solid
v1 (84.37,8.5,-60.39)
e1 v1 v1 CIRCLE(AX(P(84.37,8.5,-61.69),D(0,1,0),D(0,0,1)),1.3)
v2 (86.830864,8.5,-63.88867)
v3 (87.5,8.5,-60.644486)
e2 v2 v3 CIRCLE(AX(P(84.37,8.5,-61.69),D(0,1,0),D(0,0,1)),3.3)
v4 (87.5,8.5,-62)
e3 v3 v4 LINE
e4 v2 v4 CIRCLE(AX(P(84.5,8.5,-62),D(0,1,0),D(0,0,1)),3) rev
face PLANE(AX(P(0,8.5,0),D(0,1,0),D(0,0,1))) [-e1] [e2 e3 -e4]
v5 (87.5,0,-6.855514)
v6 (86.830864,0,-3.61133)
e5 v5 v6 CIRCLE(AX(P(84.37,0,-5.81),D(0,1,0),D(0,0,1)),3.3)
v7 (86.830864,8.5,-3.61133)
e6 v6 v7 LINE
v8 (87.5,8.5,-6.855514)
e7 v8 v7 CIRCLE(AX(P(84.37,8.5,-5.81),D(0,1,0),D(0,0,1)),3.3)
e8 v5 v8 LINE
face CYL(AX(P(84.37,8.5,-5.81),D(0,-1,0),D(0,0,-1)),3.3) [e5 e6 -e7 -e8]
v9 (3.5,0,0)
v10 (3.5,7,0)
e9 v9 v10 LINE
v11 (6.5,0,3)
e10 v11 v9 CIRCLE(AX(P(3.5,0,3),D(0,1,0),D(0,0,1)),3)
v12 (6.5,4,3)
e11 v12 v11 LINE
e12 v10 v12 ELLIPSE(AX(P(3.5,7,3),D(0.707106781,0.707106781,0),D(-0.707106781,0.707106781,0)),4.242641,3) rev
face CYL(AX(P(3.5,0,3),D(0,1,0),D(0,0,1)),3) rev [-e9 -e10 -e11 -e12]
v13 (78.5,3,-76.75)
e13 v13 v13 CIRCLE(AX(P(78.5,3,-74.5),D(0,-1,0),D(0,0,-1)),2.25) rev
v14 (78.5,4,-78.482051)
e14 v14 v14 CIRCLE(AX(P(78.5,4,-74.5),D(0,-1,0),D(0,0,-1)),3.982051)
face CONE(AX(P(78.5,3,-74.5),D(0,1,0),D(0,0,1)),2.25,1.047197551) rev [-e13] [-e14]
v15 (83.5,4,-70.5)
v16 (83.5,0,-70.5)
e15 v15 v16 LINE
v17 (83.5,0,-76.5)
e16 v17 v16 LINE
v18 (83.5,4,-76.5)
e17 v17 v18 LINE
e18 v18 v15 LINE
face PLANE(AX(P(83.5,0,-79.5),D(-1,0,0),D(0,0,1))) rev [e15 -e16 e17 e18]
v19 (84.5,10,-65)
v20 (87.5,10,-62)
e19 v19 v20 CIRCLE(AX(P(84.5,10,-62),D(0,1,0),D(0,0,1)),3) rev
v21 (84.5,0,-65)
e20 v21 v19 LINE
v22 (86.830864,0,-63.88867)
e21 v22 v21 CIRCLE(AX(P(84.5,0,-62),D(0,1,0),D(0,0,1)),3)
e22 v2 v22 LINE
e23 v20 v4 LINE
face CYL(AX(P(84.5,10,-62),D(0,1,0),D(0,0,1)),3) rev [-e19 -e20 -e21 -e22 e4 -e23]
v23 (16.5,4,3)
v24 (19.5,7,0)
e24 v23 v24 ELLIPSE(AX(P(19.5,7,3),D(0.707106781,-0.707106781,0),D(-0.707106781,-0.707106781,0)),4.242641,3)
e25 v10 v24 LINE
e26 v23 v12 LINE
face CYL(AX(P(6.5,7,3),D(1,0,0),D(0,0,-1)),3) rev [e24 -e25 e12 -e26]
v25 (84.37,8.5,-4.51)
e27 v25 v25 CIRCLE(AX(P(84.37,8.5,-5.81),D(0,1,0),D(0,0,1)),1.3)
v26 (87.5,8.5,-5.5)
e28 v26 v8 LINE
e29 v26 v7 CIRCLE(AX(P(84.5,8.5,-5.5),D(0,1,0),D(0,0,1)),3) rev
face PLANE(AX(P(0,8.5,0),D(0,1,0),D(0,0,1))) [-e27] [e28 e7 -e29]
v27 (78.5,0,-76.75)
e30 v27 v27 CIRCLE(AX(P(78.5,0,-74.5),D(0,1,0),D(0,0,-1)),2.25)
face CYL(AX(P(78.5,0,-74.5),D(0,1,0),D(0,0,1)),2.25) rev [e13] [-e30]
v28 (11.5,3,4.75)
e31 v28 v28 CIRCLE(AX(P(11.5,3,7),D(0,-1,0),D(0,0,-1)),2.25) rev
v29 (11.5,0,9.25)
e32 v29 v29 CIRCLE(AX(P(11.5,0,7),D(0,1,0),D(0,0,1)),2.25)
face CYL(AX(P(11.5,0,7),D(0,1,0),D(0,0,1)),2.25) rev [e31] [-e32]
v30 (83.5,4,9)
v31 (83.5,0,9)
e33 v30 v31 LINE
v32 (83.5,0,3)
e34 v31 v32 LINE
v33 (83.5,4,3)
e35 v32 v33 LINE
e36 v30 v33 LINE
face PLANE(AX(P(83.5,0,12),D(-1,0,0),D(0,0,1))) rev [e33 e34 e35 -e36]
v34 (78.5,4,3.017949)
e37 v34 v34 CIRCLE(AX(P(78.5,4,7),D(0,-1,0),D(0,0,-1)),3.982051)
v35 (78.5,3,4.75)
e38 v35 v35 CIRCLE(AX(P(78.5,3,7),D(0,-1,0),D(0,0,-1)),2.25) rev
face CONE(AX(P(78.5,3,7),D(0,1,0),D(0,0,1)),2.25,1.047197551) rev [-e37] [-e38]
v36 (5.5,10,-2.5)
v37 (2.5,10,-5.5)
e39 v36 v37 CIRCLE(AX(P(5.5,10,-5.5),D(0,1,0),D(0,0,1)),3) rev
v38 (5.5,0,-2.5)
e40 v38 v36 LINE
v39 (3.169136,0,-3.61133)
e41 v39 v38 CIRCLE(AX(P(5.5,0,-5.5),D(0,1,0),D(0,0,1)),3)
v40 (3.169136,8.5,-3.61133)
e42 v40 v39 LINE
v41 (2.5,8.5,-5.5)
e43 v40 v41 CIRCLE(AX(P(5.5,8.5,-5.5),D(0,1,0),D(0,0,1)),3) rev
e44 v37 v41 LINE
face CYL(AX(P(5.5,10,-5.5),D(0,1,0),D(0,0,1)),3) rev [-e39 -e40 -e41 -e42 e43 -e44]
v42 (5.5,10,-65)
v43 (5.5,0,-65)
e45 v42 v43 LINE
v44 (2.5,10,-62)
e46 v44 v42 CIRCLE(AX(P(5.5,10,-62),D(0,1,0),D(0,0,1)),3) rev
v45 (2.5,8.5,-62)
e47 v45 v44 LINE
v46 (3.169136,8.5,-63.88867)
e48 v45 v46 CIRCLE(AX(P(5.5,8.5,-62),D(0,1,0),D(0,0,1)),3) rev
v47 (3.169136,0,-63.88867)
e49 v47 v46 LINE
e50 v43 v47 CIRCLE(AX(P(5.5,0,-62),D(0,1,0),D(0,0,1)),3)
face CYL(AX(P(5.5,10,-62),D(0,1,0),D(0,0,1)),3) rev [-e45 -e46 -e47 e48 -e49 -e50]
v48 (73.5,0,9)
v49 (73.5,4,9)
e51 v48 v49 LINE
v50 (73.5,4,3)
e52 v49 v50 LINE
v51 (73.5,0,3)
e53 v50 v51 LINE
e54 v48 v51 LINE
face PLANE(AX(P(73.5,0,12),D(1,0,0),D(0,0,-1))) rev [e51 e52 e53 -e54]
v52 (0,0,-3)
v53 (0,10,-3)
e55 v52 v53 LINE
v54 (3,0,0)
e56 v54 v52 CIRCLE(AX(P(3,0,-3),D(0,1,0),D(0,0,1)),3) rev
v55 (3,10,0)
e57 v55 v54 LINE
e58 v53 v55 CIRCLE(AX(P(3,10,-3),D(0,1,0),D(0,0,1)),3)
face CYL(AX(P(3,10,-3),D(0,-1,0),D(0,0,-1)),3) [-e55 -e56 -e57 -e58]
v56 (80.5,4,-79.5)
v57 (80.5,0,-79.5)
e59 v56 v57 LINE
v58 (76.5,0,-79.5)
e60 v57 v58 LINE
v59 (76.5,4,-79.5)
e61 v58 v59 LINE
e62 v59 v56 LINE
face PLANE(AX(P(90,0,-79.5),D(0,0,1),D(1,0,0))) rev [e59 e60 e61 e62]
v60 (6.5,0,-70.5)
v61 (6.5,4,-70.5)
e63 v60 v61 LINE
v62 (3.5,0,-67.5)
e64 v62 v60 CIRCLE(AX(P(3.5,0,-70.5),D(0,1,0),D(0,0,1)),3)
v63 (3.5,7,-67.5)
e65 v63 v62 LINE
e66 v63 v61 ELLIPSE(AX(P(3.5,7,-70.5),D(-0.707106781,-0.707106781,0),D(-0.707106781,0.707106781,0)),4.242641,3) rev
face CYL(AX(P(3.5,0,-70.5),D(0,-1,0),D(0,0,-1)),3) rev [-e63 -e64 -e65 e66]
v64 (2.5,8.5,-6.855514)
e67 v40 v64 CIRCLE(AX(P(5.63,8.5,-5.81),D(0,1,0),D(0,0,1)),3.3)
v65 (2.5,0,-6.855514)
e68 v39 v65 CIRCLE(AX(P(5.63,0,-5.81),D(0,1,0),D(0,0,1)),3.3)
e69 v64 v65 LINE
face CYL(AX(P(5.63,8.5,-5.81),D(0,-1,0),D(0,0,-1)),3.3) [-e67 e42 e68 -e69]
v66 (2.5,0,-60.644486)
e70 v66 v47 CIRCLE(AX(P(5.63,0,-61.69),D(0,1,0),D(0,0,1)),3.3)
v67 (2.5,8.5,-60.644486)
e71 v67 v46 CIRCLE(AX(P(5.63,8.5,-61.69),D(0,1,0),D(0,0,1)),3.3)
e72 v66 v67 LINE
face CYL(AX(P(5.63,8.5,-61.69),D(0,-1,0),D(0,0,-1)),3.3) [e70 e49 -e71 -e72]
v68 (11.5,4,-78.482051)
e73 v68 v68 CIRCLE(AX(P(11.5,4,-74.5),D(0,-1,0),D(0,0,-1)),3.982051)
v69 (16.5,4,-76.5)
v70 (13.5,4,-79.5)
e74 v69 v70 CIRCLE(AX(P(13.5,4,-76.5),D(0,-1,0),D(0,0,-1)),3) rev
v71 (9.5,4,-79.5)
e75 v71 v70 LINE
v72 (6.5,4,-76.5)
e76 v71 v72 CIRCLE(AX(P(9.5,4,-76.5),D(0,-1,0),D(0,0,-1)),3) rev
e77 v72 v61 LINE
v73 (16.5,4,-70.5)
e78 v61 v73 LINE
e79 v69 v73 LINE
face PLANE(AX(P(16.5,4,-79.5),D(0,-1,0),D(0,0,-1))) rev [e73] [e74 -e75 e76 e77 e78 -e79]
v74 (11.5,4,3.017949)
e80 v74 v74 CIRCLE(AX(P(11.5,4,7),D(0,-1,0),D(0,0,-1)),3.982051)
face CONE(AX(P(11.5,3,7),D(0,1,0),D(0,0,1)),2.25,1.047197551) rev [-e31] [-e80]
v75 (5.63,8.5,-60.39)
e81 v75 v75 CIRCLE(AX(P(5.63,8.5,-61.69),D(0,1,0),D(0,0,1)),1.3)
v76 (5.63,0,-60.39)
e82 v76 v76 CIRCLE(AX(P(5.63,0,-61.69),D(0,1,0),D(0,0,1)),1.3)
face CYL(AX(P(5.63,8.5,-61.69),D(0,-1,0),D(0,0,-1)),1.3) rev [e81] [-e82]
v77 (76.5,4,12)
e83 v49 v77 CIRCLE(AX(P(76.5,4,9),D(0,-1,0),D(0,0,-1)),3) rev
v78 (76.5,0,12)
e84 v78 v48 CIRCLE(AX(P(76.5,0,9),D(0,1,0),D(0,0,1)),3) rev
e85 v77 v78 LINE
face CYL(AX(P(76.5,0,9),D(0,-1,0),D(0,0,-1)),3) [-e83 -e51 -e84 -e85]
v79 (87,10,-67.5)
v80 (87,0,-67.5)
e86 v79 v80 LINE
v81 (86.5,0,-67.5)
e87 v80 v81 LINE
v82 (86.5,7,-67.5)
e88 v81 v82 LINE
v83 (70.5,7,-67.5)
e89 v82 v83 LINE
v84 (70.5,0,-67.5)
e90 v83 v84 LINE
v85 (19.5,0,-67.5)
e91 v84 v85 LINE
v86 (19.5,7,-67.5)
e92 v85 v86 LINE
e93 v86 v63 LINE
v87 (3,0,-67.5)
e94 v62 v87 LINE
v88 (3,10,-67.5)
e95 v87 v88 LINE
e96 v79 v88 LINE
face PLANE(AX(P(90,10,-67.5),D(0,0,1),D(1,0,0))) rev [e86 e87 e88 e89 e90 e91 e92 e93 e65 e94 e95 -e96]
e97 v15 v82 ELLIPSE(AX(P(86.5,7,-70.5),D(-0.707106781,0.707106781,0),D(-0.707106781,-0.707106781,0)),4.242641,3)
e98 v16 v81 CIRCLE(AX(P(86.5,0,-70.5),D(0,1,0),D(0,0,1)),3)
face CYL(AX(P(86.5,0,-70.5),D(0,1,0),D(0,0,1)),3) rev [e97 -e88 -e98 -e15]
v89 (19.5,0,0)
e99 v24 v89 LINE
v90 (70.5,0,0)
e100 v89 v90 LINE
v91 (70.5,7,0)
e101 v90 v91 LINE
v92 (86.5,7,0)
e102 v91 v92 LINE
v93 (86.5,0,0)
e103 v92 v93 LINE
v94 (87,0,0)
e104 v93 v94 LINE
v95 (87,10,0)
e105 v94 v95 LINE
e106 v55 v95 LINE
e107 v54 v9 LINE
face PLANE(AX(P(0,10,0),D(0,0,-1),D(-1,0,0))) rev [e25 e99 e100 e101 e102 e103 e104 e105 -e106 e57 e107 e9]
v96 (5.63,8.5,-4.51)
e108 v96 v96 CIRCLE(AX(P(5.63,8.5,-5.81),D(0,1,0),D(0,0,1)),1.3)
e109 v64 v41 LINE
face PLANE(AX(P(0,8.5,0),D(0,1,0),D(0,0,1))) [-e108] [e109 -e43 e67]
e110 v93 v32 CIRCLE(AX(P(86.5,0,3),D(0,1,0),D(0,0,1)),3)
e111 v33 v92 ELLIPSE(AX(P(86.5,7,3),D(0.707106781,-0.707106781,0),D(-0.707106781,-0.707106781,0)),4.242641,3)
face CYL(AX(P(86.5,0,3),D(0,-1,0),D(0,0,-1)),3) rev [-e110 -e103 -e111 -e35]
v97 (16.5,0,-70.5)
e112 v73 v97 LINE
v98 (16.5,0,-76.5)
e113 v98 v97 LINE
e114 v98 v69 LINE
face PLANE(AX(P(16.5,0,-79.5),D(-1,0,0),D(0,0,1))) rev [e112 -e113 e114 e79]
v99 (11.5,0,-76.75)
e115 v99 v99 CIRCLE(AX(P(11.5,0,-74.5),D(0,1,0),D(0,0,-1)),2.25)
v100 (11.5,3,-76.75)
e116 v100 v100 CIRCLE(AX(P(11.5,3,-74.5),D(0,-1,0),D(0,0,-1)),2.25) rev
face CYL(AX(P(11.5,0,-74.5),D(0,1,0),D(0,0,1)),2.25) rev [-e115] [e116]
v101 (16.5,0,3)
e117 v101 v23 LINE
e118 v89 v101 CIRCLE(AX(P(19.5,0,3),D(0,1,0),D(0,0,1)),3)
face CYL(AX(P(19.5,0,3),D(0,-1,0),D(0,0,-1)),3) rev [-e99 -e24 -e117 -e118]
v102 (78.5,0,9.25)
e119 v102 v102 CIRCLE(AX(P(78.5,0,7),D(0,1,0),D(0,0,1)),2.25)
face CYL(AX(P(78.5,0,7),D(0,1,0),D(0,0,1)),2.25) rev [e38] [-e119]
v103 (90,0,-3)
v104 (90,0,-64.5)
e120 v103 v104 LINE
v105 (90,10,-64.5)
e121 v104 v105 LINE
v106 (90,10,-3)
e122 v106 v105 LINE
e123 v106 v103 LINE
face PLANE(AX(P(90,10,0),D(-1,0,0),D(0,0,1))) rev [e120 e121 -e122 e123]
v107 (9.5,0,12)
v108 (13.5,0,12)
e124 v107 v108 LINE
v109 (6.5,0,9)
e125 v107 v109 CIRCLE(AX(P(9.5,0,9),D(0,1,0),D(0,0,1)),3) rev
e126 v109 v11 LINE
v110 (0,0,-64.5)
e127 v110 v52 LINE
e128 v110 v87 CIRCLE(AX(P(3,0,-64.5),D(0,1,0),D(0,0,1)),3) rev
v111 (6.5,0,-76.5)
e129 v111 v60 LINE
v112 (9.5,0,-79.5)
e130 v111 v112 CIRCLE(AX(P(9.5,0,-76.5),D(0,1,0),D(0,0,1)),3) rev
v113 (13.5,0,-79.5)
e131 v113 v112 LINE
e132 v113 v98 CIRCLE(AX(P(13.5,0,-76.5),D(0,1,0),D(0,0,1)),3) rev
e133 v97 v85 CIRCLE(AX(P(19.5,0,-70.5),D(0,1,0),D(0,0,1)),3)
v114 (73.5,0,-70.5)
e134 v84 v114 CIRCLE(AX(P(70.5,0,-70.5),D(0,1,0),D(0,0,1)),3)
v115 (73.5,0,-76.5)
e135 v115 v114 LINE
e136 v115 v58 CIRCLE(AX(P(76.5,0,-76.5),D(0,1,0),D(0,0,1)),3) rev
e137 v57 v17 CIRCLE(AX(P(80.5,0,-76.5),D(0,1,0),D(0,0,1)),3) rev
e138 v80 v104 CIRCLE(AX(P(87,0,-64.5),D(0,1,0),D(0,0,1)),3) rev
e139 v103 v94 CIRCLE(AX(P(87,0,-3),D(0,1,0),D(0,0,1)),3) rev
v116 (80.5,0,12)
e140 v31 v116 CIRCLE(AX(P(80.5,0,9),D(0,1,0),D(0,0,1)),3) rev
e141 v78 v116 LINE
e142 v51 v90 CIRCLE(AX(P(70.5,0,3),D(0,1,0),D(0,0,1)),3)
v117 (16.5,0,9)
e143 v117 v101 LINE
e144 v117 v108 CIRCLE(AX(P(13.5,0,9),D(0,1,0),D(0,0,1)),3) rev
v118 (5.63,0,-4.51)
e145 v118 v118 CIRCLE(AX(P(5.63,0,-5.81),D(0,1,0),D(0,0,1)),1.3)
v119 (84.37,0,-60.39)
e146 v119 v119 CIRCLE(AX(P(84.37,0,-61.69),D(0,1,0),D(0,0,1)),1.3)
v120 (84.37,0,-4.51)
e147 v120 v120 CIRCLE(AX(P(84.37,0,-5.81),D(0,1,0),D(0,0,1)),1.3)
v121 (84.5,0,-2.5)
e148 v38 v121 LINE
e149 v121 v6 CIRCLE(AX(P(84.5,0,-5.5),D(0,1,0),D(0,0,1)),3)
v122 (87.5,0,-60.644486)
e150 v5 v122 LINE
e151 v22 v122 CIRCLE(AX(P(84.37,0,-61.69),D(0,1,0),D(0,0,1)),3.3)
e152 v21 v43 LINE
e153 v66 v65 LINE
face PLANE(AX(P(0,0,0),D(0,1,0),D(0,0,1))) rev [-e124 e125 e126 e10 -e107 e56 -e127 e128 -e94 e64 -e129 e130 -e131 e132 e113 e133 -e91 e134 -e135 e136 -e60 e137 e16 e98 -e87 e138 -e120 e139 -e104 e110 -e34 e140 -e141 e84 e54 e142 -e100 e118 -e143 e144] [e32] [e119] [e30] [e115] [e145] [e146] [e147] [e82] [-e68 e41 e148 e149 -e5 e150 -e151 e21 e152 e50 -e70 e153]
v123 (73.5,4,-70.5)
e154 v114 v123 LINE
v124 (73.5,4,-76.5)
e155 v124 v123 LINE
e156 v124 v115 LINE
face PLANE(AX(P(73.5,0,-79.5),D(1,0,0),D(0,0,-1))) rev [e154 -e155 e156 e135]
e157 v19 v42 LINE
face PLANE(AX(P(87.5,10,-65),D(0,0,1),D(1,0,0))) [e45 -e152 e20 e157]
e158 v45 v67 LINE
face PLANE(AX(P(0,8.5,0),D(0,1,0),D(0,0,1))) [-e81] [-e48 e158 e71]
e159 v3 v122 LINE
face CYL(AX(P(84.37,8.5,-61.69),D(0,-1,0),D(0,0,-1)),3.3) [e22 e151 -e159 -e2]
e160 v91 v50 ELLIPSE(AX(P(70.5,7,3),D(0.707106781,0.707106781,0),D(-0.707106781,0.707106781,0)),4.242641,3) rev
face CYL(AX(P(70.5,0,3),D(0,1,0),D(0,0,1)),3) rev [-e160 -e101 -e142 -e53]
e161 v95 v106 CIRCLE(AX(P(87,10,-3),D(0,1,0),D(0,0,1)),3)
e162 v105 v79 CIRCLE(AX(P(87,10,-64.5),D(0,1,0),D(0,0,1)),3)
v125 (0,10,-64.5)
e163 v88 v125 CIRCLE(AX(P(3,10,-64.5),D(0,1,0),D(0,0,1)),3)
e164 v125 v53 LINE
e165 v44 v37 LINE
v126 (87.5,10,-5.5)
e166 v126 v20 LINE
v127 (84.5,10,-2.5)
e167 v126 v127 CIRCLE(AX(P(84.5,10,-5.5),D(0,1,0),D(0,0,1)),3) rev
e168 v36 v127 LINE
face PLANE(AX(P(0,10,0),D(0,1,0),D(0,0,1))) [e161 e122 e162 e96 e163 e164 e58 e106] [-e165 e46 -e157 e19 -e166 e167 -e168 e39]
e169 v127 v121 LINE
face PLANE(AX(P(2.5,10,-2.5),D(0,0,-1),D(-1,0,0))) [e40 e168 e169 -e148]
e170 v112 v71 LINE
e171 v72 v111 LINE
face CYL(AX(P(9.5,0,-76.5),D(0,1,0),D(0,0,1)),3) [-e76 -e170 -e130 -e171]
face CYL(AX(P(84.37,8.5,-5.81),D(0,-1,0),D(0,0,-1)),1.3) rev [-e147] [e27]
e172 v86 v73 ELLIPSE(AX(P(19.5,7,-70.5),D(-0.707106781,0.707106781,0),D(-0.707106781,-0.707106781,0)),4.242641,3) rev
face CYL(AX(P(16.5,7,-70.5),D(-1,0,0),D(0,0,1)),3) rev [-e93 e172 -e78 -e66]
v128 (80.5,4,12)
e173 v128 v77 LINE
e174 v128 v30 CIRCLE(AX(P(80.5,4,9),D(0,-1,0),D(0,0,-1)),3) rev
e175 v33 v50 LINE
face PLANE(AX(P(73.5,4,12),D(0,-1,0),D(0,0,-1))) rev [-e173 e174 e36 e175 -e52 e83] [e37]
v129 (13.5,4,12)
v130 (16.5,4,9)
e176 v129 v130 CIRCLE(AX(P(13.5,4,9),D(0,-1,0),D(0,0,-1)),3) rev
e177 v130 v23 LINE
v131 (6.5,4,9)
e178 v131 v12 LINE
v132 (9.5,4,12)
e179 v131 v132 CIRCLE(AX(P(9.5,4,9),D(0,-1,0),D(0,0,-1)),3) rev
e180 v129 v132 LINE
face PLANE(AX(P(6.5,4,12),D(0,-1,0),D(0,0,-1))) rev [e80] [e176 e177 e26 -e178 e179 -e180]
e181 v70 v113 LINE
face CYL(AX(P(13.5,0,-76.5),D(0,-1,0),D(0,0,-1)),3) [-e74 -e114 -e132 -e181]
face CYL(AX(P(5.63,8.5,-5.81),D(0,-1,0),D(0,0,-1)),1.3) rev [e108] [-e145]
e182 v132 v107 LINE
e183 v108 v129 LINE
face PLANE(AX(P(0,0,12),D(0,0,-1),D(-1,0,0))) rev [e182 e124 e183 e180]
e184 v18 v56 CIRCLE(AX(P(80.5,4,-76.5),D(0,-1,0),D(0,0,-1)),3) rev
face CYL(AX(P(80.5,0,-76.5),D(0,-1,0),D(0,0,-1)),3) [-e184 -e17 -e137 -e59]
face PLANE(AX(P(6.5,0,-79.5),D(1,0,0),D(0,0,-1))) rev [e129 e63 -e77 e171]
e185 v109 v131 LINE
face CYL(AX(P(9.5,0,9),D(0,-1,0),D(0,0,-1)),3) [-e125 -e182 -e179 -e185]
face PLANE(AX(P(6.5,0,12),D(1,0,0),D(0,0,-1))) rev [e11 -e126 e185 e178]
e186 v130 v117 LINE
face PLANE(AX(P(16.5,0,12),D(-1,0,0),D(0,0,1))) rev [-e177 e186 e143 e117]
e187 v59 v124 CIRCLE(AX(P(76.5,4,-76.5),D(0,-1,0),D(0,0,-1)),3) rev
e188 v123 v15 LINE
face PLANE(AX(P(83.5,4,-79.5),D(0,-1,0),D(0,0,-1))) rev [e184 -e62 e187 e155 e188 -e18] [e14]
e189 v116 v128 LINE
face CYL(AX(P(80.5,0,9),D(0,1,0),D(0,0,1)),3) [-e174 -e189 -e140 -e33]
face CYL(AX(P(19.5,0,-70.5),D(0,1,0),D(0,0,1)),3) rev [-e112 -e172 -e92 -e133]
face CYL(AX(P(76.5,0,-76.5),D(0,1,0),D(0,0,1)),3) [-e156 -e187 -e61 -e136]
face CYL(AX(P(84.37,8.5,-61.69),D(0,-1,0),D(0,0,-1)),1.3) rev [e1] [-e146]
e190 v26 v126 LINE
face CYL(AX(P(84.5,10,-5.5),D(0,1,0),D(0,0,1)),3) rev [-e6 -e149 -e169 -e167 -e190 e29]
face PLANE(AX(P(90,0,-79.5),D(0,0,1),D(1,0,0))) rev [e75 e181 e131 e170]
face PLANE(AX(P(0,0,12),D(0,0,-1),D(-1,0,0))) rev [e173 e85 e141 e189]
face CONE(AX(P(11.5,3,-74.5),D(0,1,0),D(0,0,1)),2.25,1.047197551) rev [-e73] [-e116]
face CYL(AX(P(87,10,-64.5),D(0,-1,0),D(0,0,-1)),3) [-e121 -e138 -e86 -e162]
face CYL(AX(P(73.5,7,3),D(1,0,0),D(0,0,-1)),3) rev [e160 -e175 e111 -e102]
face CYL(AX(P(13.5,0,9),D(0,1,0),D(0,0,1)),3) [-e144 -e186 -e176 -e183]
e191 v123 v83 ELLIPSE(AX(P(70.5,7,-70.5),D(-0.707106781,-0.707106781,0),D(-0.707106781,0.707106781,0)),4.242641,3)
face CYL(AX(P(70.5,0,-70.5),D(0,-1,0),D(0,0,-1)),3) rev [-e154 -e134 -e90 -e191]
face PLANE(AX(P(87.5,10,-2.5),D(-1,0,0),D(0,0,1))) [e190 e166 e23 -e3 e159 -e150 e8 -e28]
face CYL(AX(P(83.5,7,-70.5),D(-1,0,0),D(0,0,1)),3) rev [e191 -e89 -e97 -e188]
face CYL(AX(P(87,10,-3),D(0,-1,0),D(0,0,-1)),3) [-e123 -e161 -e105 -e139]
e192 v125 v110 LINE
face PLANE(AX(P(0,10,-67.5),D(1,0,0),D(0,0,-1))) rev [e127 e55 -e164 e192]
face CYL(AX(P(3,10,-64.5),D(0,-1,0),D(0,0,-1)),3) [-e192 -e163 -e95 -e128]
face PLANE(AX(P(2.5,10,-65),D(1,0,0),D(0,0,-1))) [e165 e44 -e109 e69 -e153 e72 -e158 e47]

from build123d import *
from OCP.BRepFilletAPI import BRepFilletAPI_MakeChamfer

# Parameters (mm, degrees)
SKETCH5_W             = 90
SKETCH5_H             = 67.5
SKETCH5_W_2           = 85
SKETCH5_H_2           = 62.5
BOSS_EXTRUDE3_DEPTH   = 10
FILLET1_R             = 3
SKETCH7_R             = 3.3
SKETCH7_R_2           = 1.3
BOSS_EXTRUDE5_DEPTH   = 8.5
SKETCH11_W            = 10
SKETCH11_H            = 4
BOSS_EXTRUDE6_DEPTH   = 12
FILLET3_R             = 3
SKETCH13_R            = 2.25
CUT_EXTRUDE1_DEPTH    = 113.659886384
CHAMFER2_SIZE         = 1
CHAMFER2_SIZE2        = 1.732050808
CIRPATTERN1_OUTLINE_R = 2.25
CIRPATTERN1_DEPTH     = 2.9999999
CIRPATTERN1_START     = 2.9999999
CIRPATTERN1_2_DEPTH   = 1.0000001
FILLET5_R             = 3


with BuildPart() as part:
    # Sketch5 → Boss-Extrude3 (new body)
    with BuildSketch(Plane(origin=(0, 0, 0), x_dir=(1, 0, 0), z_dir=(0, 1, 0))):
        with Locations((45, 33.75)):
            Rectangle(SKETCH5_W, SKETCH5_H)
        with Locations((45, 33.75)):
            Rectangle(SKETCH5_W_2, SKETCH5_H_2, mode=Mode.SUBTRACT)
    extrude(amount=BOSS_EXTRUDE3_DEPTH)

    # Fillet1
    fillet1_edges = [part.edges().sort_by_distance(p)[0] for p in [
        (87.5, 5, -2.5),
        (87.5, 5, -65),
        (2.5, 5, -65),
        (2.5, 5, -2.5),
        (90, 5, -67.5),
        (90, 5, 0),
        (0, 5, 0),
        (0, 5, -67.5),
    ]]
    fillet(fillet1_edges, radius=FILLET1_R)

    # Sketch7 → Boss-Extrude5 (add)
    # profile 1 of 4: a face of its own
    with BuildSketch(Plane(origin=(0, 0, 0), x_dir=(1, 0, 0), z_dir=(0, 1, 0))):
        with Locations((5.63, 5.81)):
            Circle(SKETCH7_R)
        with Locations(Location((5.63, 5.81, 0), (0, 0, 270))):
            Circle(SKETCH7_R_2, mode=Mode.SUBTRACT)
    # profile 2 of 4: a face of its own
    with BuildSketch(Plane(origin=(0, 0, 0), x_dir=(1, 0, 0), z_dir=(0, 1, 0))):
        with Locations((5.63, 61.69)):
            Circle(SKETCH7_R)
        with Locations(Location((5.63, 61.69, 0), (0, 0, 270))):
            Circle(SKETCH7_R_2, mode=Mode.SUBTRACT)
    # profile 3 of 4: a face of its own
    with BuildSketch(Plane(origin=(0, 0, 0), x_dir=(1, 0, 0), z_dir=(0, 1, 0))):
        with Locations((84.37, 5.81)):
            Circle(SKETCH7_R)
        with Locations(Location((84.37, 5.81, 0), (0, 0, 270))):
            Circle(SKETCH7_R_2, mode=Mode.SUBTRACT)
    # profile 4 of 4: a face of its own
    with BuildSketch(Plane(origin=(0, 0, 0), x_dir=(1, 0, 0), z_dir=(0, 1, 0))):
        with Locations((84.37, 61.69)):
            Circle(SKETCH7_R)
        with Locations(Location((84.37, 61.69, 0), (0, 0, 270))):
            Circle(SKETCH7_R_2, mode=Mode.SUBTRACT)
    extrude(amount=BOSS_EXTRUDE5_DEPTH)

    # Sketch11 → Boss-Extrude6 (add)
    with BuildSketch(Plane.XY):
        with Locations((11.5, 2)):
            Rectangle(SKETCH11_W, SKETCH11_H)
        with Locations((78.5, 2)):
            Rectangle(SKETCH11_W, SKETCH11_H)
    extrude(amount=BOSS_EXTRUDE6_DEPTH)

    # Fillet3
    fillet3_edges = [part.edges().sort_by_distance(p)[0] for p in [
        (6.5, 2, 0),
        (16.5, 2, 0),
        (11.5, 4, 0),
        (6.5, 2, 12),
        (16.5, 2, 12),
        (73.5, 2, 0),
        (83.5, 2, 0),
        (78.5, 4, 0),
        (73.5, 2, 12),
        (83.5, 2, 12),
    ]]
    fillet(fillet3_edges, radius=FILLET3_R)

    # Sketch13 → Cut-Extrude1 (cut, through all)
    with BuildSketch(Plane(origin=(0, 4, 0), x_dir=(1, 0, 0), z_dir=(0, 1, 0))):
        with Locations(Location((11.5, -7, 0), (0, 0, 270))):
            Circle(SKETCH13_R)
        with Locations(Location((78.5, -7, 0), (0, 0, 270))):
            Circle(SKETCH13_R)
    extrude(amount=-CUT_EXTRUDE1_DEPTH, mode=Mode.SUBTRACT)

    # Chamfer2: one chamfer whose edges measure the first distance from different faces: ONE call of the kernel's chamfer builder (chamfer() names one face for all edges)
    chamfer2_edges_1 = [part.edges().sort_by_distance(p)[0] for p in [
        (11.5, 4, 4.75),
    ]]
    chamfer2_side_1 = [part.faces().sort_by_distance(p)[0] for p in [
        (11.5, 2, 4.75),
    ]]
    chamfer2_edges_2 = [part.edges().sort_by_distance(p)[0] for p in [
        (78.5, 4, 4.75),
    ]]
    chamfer2_side_2 = [part.faces().sort_by_distance(p)[0] for p in [
        (78.5, 2, 4.75),
    ]]
    chamfer2 = BRepFilletAPI_MakeChamfer(part.part.solid().wrapped)
    for e in chamfer2_edges_1:
        chamfer2.Add(CHAMFER2_SIZE, CHAMFER2_SIZE2, e.wrapped, chamfer2_side_1[0].wrapped)  # the first distance lies on this face
    for e in chamfer2_edges_2:
        chamfer2.Add(CHAMFER2_SIZE, CHAMFER2_SIZE2, e.wrapped, chamfer2_side_2[0].wrapped)  # the first distance lies on this face
    add(Compound.cast(chamfer2.Shape()), mode=Mode.REPLACE)

    # CirPattern1: read off the stored shape, not the designer's step
    # CirPattern1 outline → CirPattern1 (add)
    # profile 1 of 2: a face of its own
    with BuildSketch(Plane(origin=(0, 0, 0), x_dir=(1, 0, 0), z_dir=(0, 1, 0))):
        with BuildLine():
            Line((73.5, 76.5), (73.5, 67.5))
            Line((73.5, 67.5), (83.5, 67.5))
            Line((83.5, 67.5), (83.5, 76.5))
            ThreePointArc((83.5, 76.5), (82.621320344, 78.621320344), (80.5, 79.5))
            Line((80.5, 79.5), (76.5, 79.5))
            ThreePointArc((76.5, 79.5), (74.378679656, 78.621320344), (73.5, 76.5))
        make_face()
        with Locations((78.5, 74.5)):
            Circle(CIRPATTERN1_OUTLINE_R, mode=Mode.SUBTRACT)
    # profile 2 of 2: a face of its own
    with BuildSketch(Plane(origin=(0, 0, 0), x_dir=(1, 0, 0), z_dir=(0, 1, 0))):
        with BuildLine():
            Line((6.5, 76.5), (6.5, 67.5))
            Line((6.5, 67.5), (16.5, 67.5))
            Line((16.5, 67.5), (16.5, 76.5))
            ThreePointArc((16.5, 76.5), (15.621320344, 78.621320344), (13.5, 79.5))
            Line((13.5, 79.5), (9.5, 79.5))
            ThreePointArc((9.5, 79.5), (7.378679656, 78.621320344), (6.5, 76.5))
        make_face()
        with Locations((11.5, 74.5)):
            Circle(CIRPATTERN1_OUTLINE_R, mode=Mode.SUBTRACT)
    extrude(amount=CIRPATTERN1_DEPTH)

    # CirPattern1 2 outline → CirPattern1 2 (add)
    with BuildSketch(Plane(origin=(0, 0, 0), x_dir=(1, 0, 0), z_dir=(0, 1, 0)).offset(CIRPATTERN1_START)):
        with BuildLine():
            Line((73.5, 76.5), (73.5, 67.5))
            Line((73.5, 67.5), (83.5, 67.5))
            Line((83.5, 67.5), (83.5, 76.5))
            ThreePointArc((83.5, 76.5), (82.621320344, 78.621320344), (80.5, 79.5))
            Line((80.5, 79.5), (76.5, 79.5))
            ThreePointArc((76.5, 79.5), (74.378679656, 78.621320344), (73.5, 76.5))
        make_face()
        with BuildLine():
            Line((6.5, 76.5), (6.5, 67.5))
            Line((6.5, 67.5), (16.5, 67.5))
            Line((16.5, 67.5), (16.5, 76.5))
            ThreePointArc((16.5, 76.5), (15.621320344, 78.621320344), (13.5, 79.5))
            Line((13.5, 79.5), (9.5, 79.5))
            ThreePointArc((9.5, 79.5), (7.378679656, 78.621320344), (6.5, 76.5))
        make_face()
    extrude(amount=CIRPATTERN1_2_DEPTH)

    # CirPattern1 3: loft between two sections, ruled curve by curve
    cirpattern1_3_from = [
        Edge.make_three_point_arc((11.5, 3, -76.75), (9.25, 3, -74.5), (11.5, 3, -72.25)),
        Edge.make_three_point_arc((11.5, 3, -72.25), (13.75, 3, -74.5), (11.5, 3, -76.75)),
    ]
    cirpattern1_3_to = [
        Edge.make_three_point_arc((11.5, 4, -78.482050808), (7.517949192, 4, -74.5), (11.5, 4, -70.517949192)),
        Edge.make_three_point_arc((11.5, 4, -70.517949192), (15.482050808, 4, -74.5), (11.5, 4, -78.482050808)),
    ]
    cirpattern1_3 = Solid(Shell([*[Face.make_surface_from_curves(cirpattern1_3_from[k], cirpattern1_3_to[k]) for k in range(2)], Face(Wire(cirpattern1_3_from)), Face(Wire(cirpattern1_3_to))]))
    add(cirpattern1_3, mode=Mode.SUBTRACT)

    # CirPattern1 4: loft between two sections, ruled curve by curve
    cirpattern1_4_from = [
        Edge.make_three_point_arc((78.5, 3, -76.75), (76.25, 3, -74.5), (78.5, 3, -72.25)),
        Edge.make_three_point_arc((78.5, 3, -72.25), (80.75, 3, -74.5), (78.5, 3, -76.75)),
    ]
    cirpattern1_4_to = [
        Edge.make_three_point_arc((78.5, 4, -78.482050808), (74.517949192, 4, -74.5), (78.5, 4, -70.517949192)),
        Edge.make_three_point_arc((78.5, 4, -70.517949192), (82.482050808, 4, -74.5), (78.5, 4, -78.482050808)),
    ]
    cirpattern1_4 = Solid(Shell([*[Face.make_surface_from_curves(cirpattern1_4_from[k], cirpattern1_4_to[k]) for k in range(2)], Face(Wire(cirpattern1_4_from)), Face(Wire(cirpattern1_4_to))]))
    add(cirpattern1_4, mode=Mode.SUBTRACT)

    # Fillet5
    fillet5_edges = [part.edges().sort_by_distance(p)[0] for p in [
        (83.5, 2, -67.5),
        (73.5, 2, -67.5),
        (78.5, 4, -67.5),
        (16.5, 2, -67.5),
        (6.5, 2, -67.5),
        (11.5, 4, -67.5),
    ]]
    fillet(fillet5_edges, radius=FILLET5_R)


solid = part.part
